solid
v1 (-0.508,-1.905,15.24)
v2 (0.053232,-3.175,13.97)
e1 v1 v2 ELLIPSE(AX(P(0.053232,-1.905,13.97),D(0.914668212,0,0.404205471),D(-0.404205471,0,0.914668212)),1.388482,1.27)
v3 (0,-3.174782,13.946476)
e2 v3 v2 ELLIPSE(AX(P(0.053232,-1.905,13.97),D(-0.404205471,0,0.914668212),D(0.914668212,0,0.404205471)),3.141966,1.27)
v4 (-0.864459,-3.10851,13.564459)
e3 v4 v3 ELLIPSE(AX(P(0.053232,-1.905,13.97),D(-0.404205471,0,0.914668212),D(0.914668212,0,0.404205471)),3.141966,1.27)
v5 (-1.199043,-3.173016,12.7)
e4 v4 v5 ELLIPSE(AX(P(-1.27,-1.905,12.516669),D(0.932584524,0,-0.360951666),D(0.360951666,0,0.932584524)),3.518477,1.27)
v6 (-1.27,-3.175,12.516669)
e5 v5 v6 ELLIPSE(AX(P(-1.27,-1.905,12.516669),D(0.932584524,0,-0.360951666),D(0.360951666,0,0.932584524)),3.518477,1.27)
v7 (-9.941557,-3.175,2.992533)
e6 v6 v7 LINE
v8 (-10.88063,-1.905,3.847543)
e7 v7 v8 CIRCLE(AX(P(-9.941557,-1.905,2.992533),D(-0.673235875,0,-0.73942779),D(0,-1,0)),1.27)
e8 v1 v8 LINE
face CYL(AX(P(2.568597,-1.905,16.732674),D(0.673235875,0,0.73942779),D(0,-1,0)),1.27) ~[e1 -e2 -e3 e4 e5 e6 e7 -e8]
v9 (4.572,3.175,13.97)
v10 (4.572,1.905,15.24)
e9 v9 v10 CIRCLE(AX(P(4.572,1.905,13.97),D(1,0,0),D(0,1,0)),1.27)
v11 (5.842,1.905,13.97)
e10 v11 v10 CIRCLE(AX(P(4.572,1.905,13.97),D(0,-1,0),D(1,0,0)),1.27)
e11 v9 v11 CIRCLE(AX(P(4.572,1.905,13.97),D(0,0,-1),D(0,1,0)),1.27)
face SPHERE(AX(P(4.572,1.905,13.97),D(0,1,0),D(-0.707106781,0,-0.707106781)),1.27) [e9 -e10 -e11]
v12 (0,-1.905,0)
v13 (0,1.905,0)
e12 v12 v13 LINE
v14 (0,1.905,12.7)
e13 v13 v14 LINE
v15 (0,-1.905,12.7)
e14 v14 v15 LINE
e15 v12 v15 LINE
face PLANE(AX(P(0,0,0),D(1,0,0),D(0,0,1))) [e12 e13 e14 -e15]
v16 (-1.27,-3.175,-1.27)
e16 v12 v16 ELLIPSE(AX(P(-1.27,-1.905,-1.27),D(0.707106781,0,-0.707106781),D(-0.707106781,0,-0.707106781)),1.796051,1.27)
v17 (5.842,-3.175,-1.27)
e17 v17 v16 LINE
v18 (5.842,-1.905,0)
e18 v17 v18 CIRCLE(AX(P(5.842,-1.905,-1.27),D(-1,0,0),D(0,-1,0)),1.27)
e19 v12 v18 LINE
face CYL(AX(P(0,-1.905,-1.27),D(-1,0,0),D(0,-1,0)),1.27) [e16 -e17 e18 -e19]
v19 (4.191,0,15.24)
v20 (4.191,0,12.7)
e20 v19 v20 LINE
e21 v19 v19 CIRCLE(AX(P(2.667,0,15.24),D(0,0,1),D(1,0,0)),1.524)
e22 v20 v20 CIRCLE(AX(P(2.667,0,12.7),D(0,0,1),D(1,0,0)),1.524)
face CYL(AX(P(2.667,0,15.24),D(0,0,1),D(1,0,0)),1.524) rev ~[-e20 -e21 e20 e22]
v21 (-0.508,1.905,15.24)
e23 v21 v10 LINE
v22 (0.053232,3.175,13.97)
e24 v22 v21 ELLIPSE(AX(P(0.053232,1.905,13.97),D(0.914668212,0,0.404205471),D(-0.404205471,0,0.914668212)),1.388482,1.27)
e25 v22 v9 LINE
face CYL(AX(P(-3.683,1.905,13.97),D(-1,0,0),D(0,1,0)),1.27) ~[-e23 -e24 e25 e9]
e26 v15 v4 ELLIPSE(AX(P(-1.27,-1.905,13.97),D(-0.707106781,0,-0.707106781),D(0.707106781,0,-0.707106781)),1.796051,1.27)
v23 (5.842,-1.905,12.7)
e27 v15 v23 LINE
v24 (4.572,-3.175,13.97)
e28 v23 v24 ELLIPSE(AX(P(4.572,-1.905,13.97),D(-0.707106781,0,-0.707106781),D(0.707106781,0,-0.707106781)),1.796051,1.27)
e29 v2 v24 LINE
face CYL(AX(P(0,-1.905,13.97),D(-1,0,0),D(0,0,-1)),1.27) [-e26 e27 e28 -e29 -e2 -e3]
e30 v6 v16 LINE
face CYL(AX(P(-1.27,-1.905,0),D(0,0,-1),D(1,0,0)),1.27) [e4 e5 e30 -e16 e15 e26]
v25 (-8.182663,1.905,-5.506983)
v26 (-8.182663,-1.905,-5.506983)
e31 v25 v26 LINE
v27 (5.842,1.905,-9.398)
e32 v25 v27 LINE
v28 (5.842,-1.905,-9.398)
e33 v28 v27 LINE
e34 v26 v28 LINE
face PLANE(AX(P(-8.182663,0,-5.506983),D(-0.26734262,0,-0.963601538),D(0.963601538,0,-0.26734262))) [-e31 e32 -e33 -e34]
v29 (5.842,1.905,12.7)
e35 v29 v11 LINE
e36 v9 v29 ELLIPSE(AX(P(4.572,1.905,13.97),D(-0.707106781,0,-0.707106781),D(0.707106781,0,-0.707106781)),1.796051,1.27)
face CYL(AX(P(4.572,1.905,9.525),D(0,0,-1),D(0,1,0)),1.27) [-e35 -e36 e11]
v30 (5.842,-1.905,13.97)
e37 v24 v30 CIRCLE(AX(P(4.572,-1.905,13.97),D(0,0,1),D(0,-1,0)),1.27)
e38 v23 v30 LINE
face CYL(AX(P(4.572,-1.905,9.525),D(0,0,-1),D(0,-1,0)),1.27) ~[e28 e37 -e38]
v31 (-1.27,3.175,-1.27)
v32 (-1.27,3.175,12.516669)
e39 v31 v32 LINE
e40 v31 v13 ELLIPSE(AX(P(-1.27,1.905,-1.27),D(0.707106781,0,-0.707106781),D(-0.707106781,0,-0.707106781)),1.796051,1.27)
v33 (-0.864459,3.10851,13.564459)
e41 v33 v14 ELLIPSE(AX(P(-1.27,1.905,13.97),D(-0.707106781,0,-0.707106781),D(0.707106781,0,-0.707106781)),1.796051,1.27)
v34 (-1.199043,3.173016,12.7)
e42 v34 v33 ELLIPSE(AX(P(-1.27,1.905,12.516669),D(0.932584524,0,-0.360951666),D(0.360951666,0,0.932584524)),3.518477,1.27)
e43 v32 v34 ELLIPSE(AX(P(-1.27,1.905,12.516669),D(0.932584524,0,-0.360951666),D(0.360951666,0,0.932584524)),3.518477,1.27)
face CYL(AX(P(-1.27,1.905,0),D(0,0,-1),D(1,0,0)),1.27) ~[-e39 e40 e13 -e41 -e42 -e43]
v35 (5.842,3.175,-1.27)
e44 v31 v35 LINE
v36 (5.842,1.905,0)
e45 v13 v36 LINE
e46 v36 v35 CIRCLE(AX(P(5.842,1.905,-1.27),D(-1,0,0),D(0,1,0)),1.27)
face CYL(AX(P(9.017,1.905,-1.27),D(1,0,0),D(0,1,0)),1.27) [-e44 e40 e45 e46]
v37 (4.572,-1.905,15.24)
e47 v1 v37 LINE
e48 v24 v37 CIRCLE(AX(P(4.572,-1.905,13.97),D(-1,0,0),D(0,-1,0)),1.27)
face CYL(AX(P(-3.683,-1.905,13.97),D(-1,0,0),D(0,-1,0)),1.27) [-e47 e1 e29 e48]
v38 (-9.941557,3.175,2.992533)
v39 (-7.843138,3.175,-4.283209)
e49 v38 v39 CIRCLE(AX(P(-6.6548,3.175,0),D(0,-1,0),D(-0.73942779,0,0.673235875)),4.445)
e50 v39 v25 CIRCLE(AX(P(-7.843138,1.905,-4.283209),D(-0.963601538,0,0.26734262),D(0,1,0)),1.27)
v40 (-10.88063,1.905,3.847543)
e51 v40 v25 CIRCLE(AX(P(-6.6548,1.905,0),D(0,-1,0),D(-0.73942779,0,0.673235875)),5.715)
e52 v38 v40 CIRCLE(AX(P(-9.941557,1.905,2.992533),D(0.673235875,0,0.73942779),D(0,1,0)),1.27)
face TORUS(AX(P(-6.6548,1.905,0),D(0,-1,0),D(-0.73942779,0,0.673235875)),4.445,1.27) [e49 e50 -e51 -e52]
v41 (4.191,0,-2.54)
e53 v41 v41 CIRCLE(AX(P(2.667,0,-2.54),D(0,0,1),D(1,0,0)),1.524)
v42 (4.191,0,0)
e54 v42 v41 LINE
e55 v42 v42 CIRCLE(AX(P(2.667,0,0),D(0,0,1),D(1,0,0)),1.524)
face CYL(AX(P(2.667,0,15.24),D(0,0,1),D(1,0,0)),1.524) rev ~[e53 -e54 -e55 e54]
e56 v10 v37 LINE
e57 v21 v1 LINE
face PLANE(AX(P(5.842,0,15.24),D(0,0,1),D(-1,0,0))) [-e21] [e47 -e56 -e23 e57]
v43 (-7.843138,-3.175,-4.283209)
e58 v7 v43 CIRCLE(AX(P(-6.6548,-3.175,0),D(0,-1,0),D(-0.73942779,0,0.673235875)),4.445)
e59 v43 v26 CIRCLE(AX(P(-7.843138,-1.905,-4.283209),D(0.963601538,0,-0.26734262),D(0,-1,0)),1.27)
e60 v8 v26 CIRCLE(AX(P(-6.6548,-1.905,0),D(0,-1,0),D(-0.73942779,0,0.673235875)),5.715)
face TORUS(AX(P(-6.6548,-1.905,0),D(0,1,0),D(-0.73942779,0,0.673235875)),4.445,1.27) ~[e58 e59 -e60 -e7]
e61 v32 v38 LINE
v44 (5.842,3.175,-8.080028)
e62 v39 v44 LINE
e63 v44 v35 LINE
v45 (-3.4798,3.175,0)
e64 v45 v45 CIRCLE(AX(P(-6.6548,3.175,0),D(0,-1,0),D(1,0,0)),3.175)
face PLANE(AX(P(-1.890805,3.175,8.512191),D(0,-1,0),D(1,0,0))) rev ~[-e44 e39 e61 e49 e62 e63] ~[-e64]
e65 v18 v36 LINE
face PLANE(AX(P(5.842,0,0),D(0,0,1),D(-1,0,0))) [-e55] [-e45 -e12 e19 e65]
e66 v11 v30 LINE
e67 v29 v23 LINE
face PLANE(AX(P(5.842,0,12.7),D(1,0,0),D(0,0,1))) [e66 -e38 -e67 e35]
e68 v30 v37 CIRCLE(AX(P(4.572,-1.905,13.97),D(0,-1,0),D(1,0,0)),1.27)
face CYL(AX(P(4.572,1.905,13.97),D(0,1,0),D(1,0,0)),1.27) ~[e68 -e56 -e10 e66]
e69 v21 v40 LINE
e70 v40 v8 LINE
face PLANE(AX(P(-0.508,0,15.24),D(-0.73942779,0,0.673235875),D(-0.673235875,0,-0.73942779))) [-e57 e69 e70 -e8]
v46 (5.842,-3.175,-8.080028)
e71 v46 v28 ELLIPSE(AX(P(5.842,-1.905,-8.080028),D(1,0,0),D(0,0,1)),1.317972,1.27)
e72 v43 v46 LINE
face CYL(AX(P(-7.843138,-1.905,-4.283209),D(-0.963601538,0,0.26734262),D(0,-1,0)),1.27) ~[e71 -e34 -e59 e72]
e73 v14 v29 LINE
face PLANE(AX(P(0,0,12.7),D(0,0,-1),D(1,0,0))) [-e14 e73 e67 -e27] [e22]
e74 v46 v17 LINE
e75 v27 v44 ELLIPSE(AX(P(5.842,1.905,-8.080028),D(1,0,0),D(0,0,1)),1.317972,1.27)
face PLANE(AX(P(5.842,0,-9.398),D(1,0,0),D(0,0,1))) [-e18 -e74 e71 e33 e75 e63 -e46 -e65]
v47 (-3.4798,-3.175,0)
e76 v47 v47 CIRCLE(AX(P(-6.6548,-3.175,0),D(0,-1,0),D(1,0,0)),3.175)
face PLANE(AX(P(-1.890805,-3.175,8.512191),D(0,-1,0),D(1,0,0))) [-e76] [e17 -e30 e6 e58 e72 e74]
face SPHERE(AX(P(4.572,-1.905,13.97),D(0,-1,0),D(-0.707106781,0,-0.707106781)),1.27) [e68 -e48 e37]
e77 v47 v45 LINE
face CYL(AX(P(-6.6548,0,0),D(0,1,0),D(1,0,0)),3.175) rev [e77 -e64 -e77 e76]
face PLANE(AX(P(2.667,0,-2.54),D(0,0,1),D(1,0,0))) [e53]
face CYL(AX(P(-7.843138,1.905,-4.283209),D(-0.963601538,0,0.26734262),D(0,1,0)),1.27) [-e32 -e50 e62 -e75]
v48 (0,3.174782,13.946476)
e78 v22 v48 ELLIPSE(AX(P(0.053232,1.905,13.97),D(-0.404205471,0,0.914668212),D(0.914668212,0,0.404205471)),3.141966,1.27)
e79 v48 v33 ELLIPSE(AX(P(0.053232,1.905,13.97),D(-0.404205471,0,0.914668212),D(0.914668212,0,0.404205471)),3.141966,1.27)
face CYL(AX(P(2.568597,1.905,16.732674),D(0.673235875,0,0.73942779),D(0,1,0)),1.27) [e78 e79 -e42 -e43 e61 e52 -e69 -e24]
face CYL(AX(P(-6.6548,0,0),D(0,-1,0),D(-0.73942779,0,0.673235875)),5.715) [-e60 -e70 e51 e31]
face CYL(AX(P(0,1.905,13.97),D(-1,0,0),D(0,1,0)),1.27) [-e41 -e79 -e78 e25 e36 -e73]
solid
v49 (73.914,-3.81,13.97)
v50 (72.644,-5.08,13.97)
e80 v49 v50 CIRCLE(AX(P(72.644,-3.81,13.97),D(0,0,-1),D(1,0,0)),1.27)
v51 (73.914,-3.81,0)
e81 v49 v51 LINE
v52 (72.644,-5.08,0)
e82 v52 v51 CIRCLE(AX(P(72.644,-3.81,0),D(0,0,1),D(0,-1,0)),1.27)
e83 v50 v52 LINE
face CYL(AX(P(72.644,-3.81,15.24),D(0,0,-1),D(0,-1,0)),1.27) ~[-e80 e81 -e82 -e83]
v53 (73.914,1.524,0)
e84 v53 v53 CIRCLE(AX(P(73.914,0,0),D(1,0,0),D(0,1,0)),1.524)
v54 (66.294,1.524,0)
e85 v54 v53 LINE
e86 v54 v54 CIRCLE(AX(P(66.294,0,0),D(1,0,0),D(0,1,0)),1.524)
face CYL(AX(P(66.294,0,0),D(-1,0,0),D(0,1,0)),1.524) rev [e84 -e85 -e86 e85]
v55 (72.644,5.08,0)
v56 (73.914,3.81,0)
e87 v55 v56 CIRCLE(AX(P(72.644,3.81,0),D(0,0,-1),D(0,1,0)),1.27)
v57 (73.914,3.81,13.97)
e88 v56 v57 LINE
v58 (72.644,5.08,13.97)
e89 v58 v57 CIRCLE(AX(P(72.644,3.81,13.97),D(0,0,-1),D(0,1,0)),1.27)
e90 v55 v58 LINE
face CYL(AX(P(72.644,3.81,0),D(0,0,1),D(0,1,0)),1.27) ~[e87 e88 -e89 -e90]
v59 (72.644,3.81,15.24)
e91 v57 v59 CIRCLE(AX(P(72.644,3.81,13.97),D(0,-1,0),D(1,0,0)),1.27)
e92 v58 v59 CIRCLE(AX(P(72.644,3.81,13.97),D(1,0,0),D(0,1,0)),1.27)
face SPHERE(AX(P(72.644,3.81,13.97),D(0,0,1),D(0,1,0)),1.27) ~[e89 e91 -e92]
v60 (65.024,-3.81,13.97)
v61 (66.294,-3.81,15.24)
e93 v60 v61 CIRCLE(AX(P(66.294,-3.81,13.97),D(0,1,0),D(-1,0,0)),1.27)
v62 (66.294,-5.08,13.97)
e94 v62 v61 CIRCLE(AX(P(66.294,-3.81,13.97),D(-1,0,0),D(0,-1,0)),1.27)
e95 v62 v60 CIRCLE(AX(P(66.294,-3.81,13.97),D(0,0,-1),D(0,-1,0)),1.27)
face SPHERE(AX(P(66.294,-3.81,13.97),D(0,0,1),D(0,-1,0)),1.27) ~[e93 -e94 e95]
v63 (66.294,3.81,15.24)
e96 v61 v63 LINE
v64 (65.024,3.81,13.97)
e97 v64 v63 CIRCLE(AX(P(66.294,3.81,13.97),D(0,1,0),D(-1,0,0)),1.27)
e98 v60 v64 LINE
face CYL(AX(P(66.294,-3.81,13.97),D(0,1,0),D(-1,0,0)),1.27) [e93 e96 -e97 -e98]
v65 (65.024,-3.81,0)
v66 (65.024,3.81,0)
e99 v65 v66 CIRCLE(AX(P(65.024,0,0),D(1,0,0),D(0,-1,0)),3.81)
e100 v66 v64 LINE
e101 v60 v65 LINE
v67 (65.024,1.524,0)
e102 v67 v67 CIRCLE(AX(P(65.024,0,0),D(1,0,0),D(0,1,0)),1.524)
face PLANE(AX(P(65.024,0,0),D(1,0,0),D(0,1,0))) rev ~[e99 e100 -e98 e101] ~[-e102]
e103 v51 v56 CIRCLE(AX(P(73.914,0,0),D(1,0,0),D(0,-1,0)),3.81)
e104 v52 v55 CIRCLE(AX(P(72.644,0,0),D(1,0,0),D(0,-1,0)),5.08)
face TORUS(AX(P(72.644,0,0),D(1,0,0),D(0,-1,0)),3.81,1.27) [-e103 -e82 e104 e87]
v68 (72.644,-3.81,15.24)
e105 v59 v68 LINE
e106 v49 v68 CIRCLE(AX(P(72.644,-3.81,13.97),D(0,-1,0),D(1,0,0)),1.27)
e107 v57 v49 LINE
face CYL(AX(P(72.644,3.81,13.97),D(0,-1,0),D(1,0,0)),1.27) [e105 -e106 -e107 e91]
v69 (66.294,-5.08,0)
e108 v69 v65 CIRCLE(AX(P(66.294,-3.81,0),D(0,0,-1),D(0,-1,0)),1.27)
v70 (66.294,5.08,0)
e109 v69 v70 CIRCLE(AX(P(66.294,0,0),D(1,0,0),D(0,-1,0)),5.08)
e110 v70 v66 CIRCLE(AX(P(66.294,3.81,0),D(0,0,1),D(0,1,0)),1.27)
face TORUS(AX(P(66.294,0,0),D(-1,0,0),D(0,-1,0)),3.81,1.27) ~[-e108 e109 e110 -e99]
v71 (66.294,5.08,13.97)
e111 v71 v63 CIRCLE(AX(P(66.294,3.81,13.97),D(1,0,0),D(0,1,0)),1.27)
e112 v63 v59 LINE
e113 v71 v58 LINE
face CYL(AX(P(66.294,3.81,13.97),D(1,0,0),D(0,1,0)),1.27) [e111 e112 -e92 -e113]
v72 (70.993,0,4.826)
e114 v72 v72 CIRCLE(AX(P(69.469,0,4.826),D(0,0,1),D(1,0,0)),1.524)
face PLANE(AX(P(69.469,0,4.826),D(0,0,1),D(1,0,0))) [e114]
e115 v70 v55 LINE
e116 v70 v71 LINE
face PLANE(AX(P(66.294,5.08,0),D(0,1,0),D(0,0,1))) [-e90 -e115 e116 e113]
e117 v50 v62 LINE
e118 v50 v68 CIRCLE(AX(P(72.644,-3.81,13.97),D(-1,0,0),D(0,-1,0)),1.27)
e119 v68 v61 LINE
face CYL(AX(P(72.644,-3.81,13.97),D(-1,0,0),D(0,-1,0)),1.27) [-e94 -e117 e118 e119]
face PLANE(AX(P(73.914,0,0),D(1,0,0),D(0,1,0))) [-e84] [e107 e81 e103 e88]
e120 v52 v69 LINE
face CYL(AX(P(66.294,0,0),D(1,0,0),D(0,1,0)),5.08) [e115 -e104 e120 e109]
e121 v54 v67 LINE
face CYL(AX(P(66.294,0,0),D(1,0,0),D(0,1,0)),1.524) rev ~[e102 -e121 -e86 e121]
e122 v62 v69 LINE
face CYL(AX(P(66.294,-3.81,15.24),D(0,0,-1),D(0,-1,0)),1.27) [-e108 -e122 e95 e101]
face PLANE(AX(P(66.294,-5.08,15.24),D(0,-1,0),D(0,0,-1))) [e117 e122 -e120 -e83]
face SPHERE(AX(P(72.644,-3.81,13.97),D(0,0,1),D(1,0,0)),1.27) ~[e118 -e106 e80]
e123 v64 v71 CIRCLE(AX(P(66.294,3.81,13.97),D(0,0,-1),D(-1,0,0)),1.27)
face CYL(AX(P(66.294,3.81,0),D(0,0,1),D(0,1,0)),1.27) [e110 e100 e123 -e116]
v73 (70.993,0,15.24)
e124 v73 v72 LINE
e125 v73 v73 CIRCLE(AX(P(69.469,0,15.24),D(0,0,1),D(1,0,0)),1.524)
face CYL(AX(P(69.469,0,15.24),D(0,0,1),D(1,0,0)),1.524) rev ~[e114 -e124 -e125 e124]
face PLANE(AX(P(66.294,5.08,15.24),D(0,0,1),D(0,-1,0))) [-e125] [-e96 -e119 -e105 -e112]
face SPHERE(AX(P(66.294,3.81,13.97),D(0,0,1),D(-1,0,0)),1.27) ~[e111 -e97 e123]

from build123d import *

# Parameters (mm, degrees)
F0_R          = 3.175
F2_DEPTH      = 3.175
F3_R          = 1.524
F4_DEPTH      = 7.62
F4_DEPTH_BACK = 1.27
F5_DEPTH      = 56.134
F7_R          = 1.524
F8_DEPTH      = 17.78
F6_R          = 1.524
F9_DEPTH      = 10.414
F10_T1_DEPTH  = 18.5821257943
F10_T3_DEPTH  = 8.255
F10_T5_DEPTH  = 4.445
F10_T7_DEPTH  = 9.017
F10_T9_DEPTH  = 12.7
F10_T11_DEPTH = 17.7294216388
F10_T13_DEPTH = 3.81
F10_S17_W     = 1.27
F10_S17_H     = 1.27
F10_T18_DEPTH = 1.27
F10_S23_W     = 1.27
F10_S23_H     = 1.27
F10_T24_DEPTH = 1.27
F10_T28_ANGLE = 116.8111069241
F10_T30_ANGLE = 116.8111069241
F10_T35_DEPTH = 15.875
F10_T39_DEPTH = 12.192
F10_T46_DEPTH = 15.875
F10_T50_DEPTH = 12.192
F10_T57_DEPTH = 15.875
F10_T61_DEPTH = 12.192
F10_T68_DEPTH = 15.875
F10_T72_DEPTH = 12.192
F10_2_F1_R    = 1.27
F10_2_F2_R    = 1.27
F10_2_F3_R    = 1.27


# Not quite as in the source:
# - a fillet or chamfer that OpenCascade refuses, or shapes differently, is made with other operations: its cross-section is extruded or revolved along the edge and cut away or added
# - two fillets or chamfers of one size are made in one step
# - the program builds the solid bodies; features that only make, move or delete a surface that nothing else refers to are left out


with BuildPart() as f2:
    # F0 (on Front) → F2 (new body, symmetric)
    with BuildSketch(Plane.XZ):
        with BuildLine():
            Line((-0.9398, 0), (0, 0))
            Line((0, 0), (0, 12.7))
            Line((0, 12.7), (5.842, 12.7))
            Line((5.842, 12.7), (5.842, 15.24))
            Line((5.842, 15.24), (-0.508, 15.24))
            Line((-0.508, 15.24), (-10.8806298187, 3.8475430269))
            ThreePointArc((-10.8806298187, 3.8475430269), (-4.5919612295, 5.3297205562), (-0.9398, 0))
        make_face()
        with BuildLine():
            ThreePointArc((-8.1826630726, -5.5069827884), (-3.1957909266, -4.5493385486), (-0.9398, 0))
            ThreePointArc((-0.9398, 0), (-4.5919612295, 5.3297205562), (-10.8806298187, 3.8475430269))
            ThreePointArc((-10.8806298187, 3.8475430269), (-12.1459778134, -1.5837270034), (-8.1826630726, -5.5069827884))
        make_face()
        with Locations((-6.6548, 0)):
            Circle(F0_R, mode=Mode.SUBTRACT)
        with BuildLine():
            Line((5.842, 0), (0, 0))
            Line((0, 0), (-0.9398, 0))
            ThreePointArc((-0.9398, 0), (-3.1957909266, -4.5493385486), (-8.1826630726, -5.5069827884))
            Line((-8.1826630726, -5.5069827884), (5.842, -9.398))
            Line((5.842, -9.398), (5.842, 0))
        make_face()
    extrude(amount=F2_DEPTH, both=True)

    # F3 (on face) → F5 (cut)
    with BuildSketch(Plane.YZ.offset(66.294)):
        Circle(F3_R)
    extrude(amount=-F5_DEPTH, mode=Mode.SUBTRACT)

    # F7 (on face) → F8 (cut)
    with BuildSketch(Plane.XY.offset(15.24)):
        with Locations((2.667, 0)):
            Circle(F7_R)
    extrude(amount=-F8_DEPTH, mode=Mode.SUBTRACT)

    # F10: fillet of radius 1.27 on 17 edges, made by hand

    # F10_s2 → F10_t1 (cut)
    with BuildSketch(Plane(origin=(9.4938886236, 0, 10.4273187748), x_dir=(0, 1, 0), z_dir=(-0.6732358752, 0, -0.7394277898))):
        with BuildLine():
            ThreePointArc((-3.175, -9.3657440555), (-2.8030256121, -10.2637696676), (-1.905, -10.6357440555))
            Line((-1.905, -10.6357440555), (-3.175, -10.6357440555))
            Line((-3.175, -10.6357440555), (-3.175, -9.3657440555))
        make_face()
        with BuildLine():
            ThreePointArc((3.175, -9.3657440555), (2.8030256121, -10.2637696676), (1.905, -10.6357440555))
            Line((1.905, -10.6357440555), (3.175, -10.6357440555))
            Line((3.175, -10.6357440555), (3.175, -9.3657440555))
        make_face()
    extrude(amount=F10_T1_DEPTH, mode=Mode.SUBTRACT)

    # F10_s4 → F10_t3 (cut)
    with BuildSketch(Plane.YZ.offset(-3.683)):
        with BuildLine():
            ThreePointArc((-3.175, 13.97), (-2.8030256121, 14.8680256121), (-1.905, 15.24))
            Line((-1.905, 15.24), (-3.175, 15.24))
            Line((-3.175, 15.24), (-3.175, 13.97))
        make_face()
        with BuildLine():
            ThreePointArc((3.175, 13.97), (2.8030256121, 14.8680256121), (1.905, 15.24))
            Line((1.905, 15.24), (3.175, 15.24))
            Line((3.175, 15.24), (3.175, 13.97))
        make_face()
    extrude(amount=F10_T3_DEPTH, mode=Mode.SUBTRACT)

    # F10_s6 → F10_t5 (cut)
    with BuildSketch(Plane.XY.offset(9.525)):
        with BuildLine():
            ThreePointArc((4.572, -3.175), (5.4700256121, -2.8030256121), (5.842, -1.905))
            Line((5.842, -1.905), (5.842, -3.175))
            Line((5.842, -3.175), (4.572, -3.175))
        make_face()
        with BuildLine():
            ThreePointArc((4.572, 3.175), (5.4700256121, 2.8030256121), (5.842, 1.905))
            Line((5.842, 1.905), (5.842, 3.175))
            Line((5.842, 3.175), (4.572, 3.175))
        make_face()
    extrude(amount=F10_T5_DEPTH, mode=Mode.SUBTRACT)

    # F10_s8 → F10_t7 (cut)
    with BuildSketch(Plane.YZ):
        with BuildLine():
            ThreePointArc((-1.905, 12.7), (-2.8030256121, 13.0719743879), (-3.175, 13.97))
            Line((-3.175, 13.97), (-3.175, 12.7))
            Line((-3.175, 12.7), (-1.905, 12.7))
        make_face()
        with BuildLine():
            ThreePointArc((3.175, 13.97), (2.8030256121, 13.0719743879), (1.905, 12.7))
            Line((1.905, 12.7), (3.175, 12.7))
            Line((3.175, 12.7), (3.175, 13.97))
        make_face()
        with BuildLine():
            ThreePointArc((3.175, -1.27), (2.8030256121, -0.3719743879), (1.905, 0))
            Line((1.905, 0), (3.175, 0))
            Line((3.175, 0), (3.175, -1.27))
        make_face()
        with BuildLine():
            ThreePointArc((-3.175, -1.27), (-2.8030256121, -0.3719743879), (-1.905, 0))
            Line((-1.905, 0), (-3.175, 0))
            Line((-3.175, 0), (-3.175, -1.27))
        make_face()
    extrude(amount=F10_T7_DEPTH, mode=Mode.SUBTRACT)

    # F10_s10 → F10_t9 (cut)
    with BuildSketch(Plane.XY):
        with BuildLine():
            ThreePointArc((0, -1.905), (-0.3719743879, -2.8030256121), (-1.27, -3.175))
            Line((-1.27, -3.175), (0, -3.175))
            Line((0, -3.175), (0, -1.905))
        make_face()
        with BuildLine():
            ThreePointArc((0, 1.905), (-0.3719743879, 2.8030256121), (-1.27, 3.175))
            Line((-1.27, 3.175), (0, 3.175))
            Line((0, 3.175), (0, 1.905))
        make_face()
    extrude(amount=F10_T9_DEPTH, mode=Mode.SUBTRACT)

    # F10_s12 → F10_t11 (cut)
    with BuildSketch(Plane(origin=(-6.179167626, 0, 1.7143547379), x_dir=(0, 1, 0), z_dir=(0.9636015378, 0, -0.2673426199))):
        with BuildLine():
            ThreePointArc((-3.175, -6.2241116667), (-2.8030256121, -7.1221372788), (-1.905, -7.4941116667))
            Line((-1.905, -7.4941116667), (-3.175, -7.4941116667))
            Line((-3.175, -7.4941116667), (-3.175, -6.2241116667))
        make_face()
        with BuildLine():
            ThreePointArc((3.175, -6.2241116667), (2.8030256121, -7.1221372788), (1.905, -7.4941116667))
            Line((1.905, -7.4941116667), (3.175, -7.4941116667))
            Line((3.175, -7.4941116667), (3.175, -6.2241116667))
        make_face()
    extrude(amount=F10_T11_DEPTH, mode=Mode.SUBTRACT)

    # F10_s14 → F10_t13 (cut)
    with BuildSketch(Plane.XZ.offset(-1.905)):
        with BuildLine():
            ThreePointArc((5.842, 13.97), (5.4700256121, 14.8680256121), (4.572, 15.24))
            Line((4.572, 15.24), (5.842, 15.24))
            Line((5.842, 15.24), (5.842, 13.97))
        make_face()
    extrude(amount=F10_T13_DEPTH, mode=Mode.SUBTRACT)


with BuildPart() as f4:
    # F3 (on face) → F4 (new body, two sides)
    with BuildSketch(Plane.YZ.offset(66.294)) as f4_sk:
        with BuildLine():
            ThreePointArc((-5.08, 0), (0, -5.08), (5.08, 0))
            ThreePointArc((5.08, 0), (0, 5.08), (-5.08, 0))
        make_face()
        Circle(F3_R, mode=Mode.SUBTRACT)
        with BuildLine():
            ThreePointArc((-5.08, 0), (0, 5.08), (5.08, 0))
            Line((5.08, 0), (5.08, 15.24))
            Line((5.08, 15.24), (-5.08, 15.24))
            Line((-5.08, 15.24), (-5.08, 0))
        make_face()
    extrude(amount=F4_DEPTH)
    extrude(f4_sk.sketch, amount=-F4_DEPTH_BACK)

    # F6 (on face) → F9 (cut)
    with BuildSketch(Plane.XY.offset(15.24)):
        with Locations((69.469, 0)):
            Circle(F6_R)
    extrude(amount=-F9_DEPTH, mode=Mode.SUBTRACT)

    # F10#2: fillet of radius 1.27 on 10 edges, made by hand

    # F10_2_f1
    f10_2_f1_edges = [f4.edges().sort_by_distance(p)[0] for p in [
        (73.914, 0, -5.08),
        (73.914, -5.08, 7.62),
        (73.914, 5.08, 7.62),
    ]]
    fillet(f10_2_f1_edges, radius=F10_2_F1_R)

    # F10_2_f2
    f10_2_f2_edges = [f4.edges().sort_by_distance(p)[0] for p in [
        (65.024, 0, -5.08),
        (65.024, -5.08, 7.62),
        (65.024, 5.08, 7.62),
    ]]
    fillet(f10_2_f2_edges, radius=F10_2_F2_R)

    # F10_2_f3
    f10_2_f3_edges = [f4.edges().sort_by_distance(p)[0] for p in [
        (69.469, -5.08, 15.24),
    ]]
    fillet(f10_2_f3_edges, radius=F10_2_F3_R)


with BuildPart() as f10_tool16:
    # F10_s17 → F10_t18 (new body)
    with BuildSketch(Plane.XZ.offset(1.905)):
        with Locations((5.207, 14.605)):
            Rectangle(F10_S17_W, F10_S17_H)
    extrude(amount=F10_T18_DEPTH)

    # F10_s19 → F10_t20 (revolve, cut)
    with BuildSketch(Plane(origin=(4.572, -1.905, 13.97), x_dir=(-0.7071067812, 0, -0.7071067812), z_dir=(-0.7071067812, 0, 0.7071067812))):
        with BuildLine():
            ThreePointArc((0, -1.27), (1.27, 0), (0, 1.27))
            Line((0, 1.27), (0, -1.27))
        make_face()
    revolve(axis=Axis((4.572, -1.905, 13.97), (0, -1, 0)), mode=Mode.SUBTRACT)


with BuildPart() as f2_1:
    add(f2.part)

    # F10_t15: cut F10_tool16
    add(f10_tool16.part, mode=Mode.SUBTRACT)


with BuildPart() as f10_tool22:
    # F10_s23 → F10_t24 (new body)
    with BuildSketch(Plane.XZ.offset(-1.905)):
        with Locations((5.207, 14.605)):
            Rectangle(F10_S23_W, F10_S23_H)
    extrude(amount=-F10_T24_DEPTH)

    # F10_s25 → F10_t26 (revolve, cut)
    with BuildSketch(Plane(origin=(4.572, 1.905, 13.97), x_dir=(-0.7071067812, 0, -0.7071067812), z_dir=(0.7071067812, 0, -0.7071067812))):
        with BuildLine():
            ThreePointArc((0, -1.27), (1.27, 0), (0, 1.27))
            Line((0, 1.27), (0, -1.27))
        make_face()
    revolve(axis=Axis((4.572, 1.905, 13.97), (0, 1, 0)), mode=Mode.SUBTRACT)


with BuildPart() as f2_2:
    add(f2_1.part)

    # F10_t21: cut F10_tool22
    add(f10_tool22.part, mode=Mode.SUBTRACT)

    # F10_s27 → F10_t28 (revolve, cut)
    with BuildSketch(Plane(origin=(-3.0162650989, 0, -3.3128214309), x_dir=(0, 1, 0), z_dir=(0.6732358752, 0, 0.7394277898))):
        with BuildLine():
            ThreePointArc((-3.175, 9.3657440555), (-2.8030256121, 10.2637696676), (-1.905, 10.6357440555))
            Line((-1.905, 10.6357440555), (-3.175, 10.6357440555))
            Line((-3.175, 10.6357440555), (-3.175, 9.3657440555))
        make_face()
    revolve(axis=Axis((-6.6548, -3.175, 0), (0, -1, 0)), revolution_arc=F10_T28_ANGLE, mode=Mode.SUBTRACT)

    # F10_s29 → F10_t30 (revolve, cut)
    with BuildSketch(Plane(origin=(-3.0162650989, 0, -3.3128214309), x_dir=(0, 1, 0), z_dir=(0.6732358752, 0, 0.7394277898))):
        with BuildLine():
            ThreePointArc((3.175, 9.3657440555), (2.8030256121, 10.2637696676), (1.905, 10.6357440555))
            Line((1.905, 10.6357440555), (3.175, 10.6357440555))
            Line((3.175, 10.6357440555), (3.175, 9.3657440555))
        make_face()
    revolve(axis=Axis((-6.6548, 3.175, 0), (0, -1, 0)), revolution_arc=F10_T30_ANGLE, mode=Mode.SUBTRACT)


with BuildPart() as f10_tool33:
    # F10_s34 → F10_t35 (new body)
    with BuildSketch(Plane.XY):
        with BuildLine():
            ThreePointArc((0, -1.905), (-0.3719743879, -2.8030256121), (-1.27, -3.175))
            Line((-1.27, -3.175), (0, -3.175))
            Line((0, -3.175), (0, -1.905))
        make_face()
    extrude(amount=F10_T35_DEPTH)

    split(bisect_by=Plane.XY.offset(12.7), keep=Keep.TOP)


with BuildPart() as f10_tool37:
    # F10_s38 → F10_t39 (new body)
    with BuildSketch(Plane.YZ.offset(-3.175)):
        with BuildLine():
            ThreePointArc((-1.905, 12.7), (-2.8030256121, 13.0719743879), (-3.175, 13.97))
            Line((-3.175, 13.97), (-3.175, 12.7))
            Line((-3.175, 12.7), (-1.905, 12.7))
        make_face()
    extrude(amount=F10_T39_DEPTH)

    split(bisect_by=Plane.YZ, keep=Keep.BOTTOM)


with BuildPart() as f10_tool33_1:
    add(f10_tool33.part)

    # F10_t41: intersect F10_tool37
    add(f10_tool37.part, mode=Mode.INTERSECT)


with BuildPart() as f2_3:
    add(f2_2.part)

    # F10_t31: cut F10_tool33
    add(f10_tool33_1.part, mode=Mode.SUBTRACT)


with BuildPart() as f10_tool44:
    # F10_s45 → F10_t46 (new body)
    with BuildSketch(Plane.XY.offset(-3.175)):
        with BuildLine():
            ThreePointArc((0, -1.905), (-0.3719743879, -2.8030256121), (-1.27, -3.175))
            Line((-1.27, -3.175), (0, -3.175))
            Line((0, -3.175), (0, -1.905))
        make_face()
    extrude(amount=F10_T46_DEPTH)

    split(bisect_by=Plane.XY, keep=Keep.BOTTOM)


with BuildPart() as f10_tool48:
    # F10_s49 → F10_t50 (new body)
    with BuildSketch(Plane.YZ.offset(9.017)):
        with BuildLine():
            ThreePointArc((-3.175, -1.27), (-2.8030256121, -0.3719743879), (-1.905, 0))
            Line((-1.905, 0), (-3.175, 0))
            Line((-3.175, 0), (-3.175, -1.27))
        make_face()
    extrude(amount=-F10_T50_DEPTH)

    split(bisect_by=Plane.YZ, keep=Keep.BOTTOM)


with BuildPart() as f10_tool44_1:
    add(f10_tool44.part)

    # F10_t52: intersect F10_tool48
    add(f10_tool48.part, mode=Mode.INTERSECT)


with BuildPart() as f2_4:
    add(f2_3.part)

    # F10_t42: cut F10_tool44
    add(f10_tool44_1.part, mode=Mode.SUBTRACT)


with BuildPart() as f10_tool55:
    # F10_s56 → F10_t57 (new body)
    with BuildSketch(Plane.XY):
        with BuildLine():
            ThreePointArc((0, 1.905), (-0.3719743879, 2.8030256121), (-1.27, 3.175))
            Line((-1.27, 3.175), (0, 3.175))
            Line((0, 3.175), (0, 1.905))
        make_face()
    extrude(amount=F10_T57_DEPTH)

    split(bisect_by=Plane.XY.offset(12.7), keep=Keep.TOP)


with BuildPart() as f10_tool59:
    # F10_s60 → F10_t61 (new body)
    with BuildSketch(Plane.YZ.offset(-3.175)):
        with BuildLine():
            ThreePointArc((3.175, 13.97), (2.8030256121, 13.0719743879), (1.905, 12.7))
            Line((1.905, 12.7), (3.175, 12.7))
            Line((3.175, 12.7), (3.175, 13.97))
        make_face()
    extrude(amount=F10_T61_DEPTH)

    split(bisect_by=Plane.YZ, keep=Keep.BOTTOM)


with BuildPart() as f10_tool55_1:
    add(f10_tool55.part)

    # F10_t63: intersect F10_tool59
    add(f10_tool59.part, mode=Mode.INTERSECT)


with BuildPart() as f2_5:
    add(f2_4.part)

    # F10_t53: cut F10_tool55
    add(f10_tool55_1.part, mode=Mode.SUBTRACT)


with BuildPart() as f10_tool66:
    # F10_s67 → F10_t68 (new body)
    with BuildSketch(Plane.XY.offset(-3.175)):
        with BuildLine():
            ThreePointArc((0, 1.905), (-0.3719743879, 2.8030256121), (-1.27, 3.175))
            Line((-1.27, 3.175), (0, 3.175))
            Line((0, 3.175), (0, 1.905))
        make_face()
    extrude(amount=F10_T68_DEPTH)

    split(bisect_by=Plane.XY, keep=Keep.BOTTOM)


with BuildPart() as f10_tool70:
    # F10_s71 → F10_t72 (new body)
    with BuildSketch(Plane.YZ.offset(9.017)):
        with BuildLine():
            ThreePointArc((3.175, -1.27), (2.8030256121, -0.3719743879), (1.905, 0))
            Line((1.905, 0), (3.175, 0))
            Line((3.175, 0), (3.175, -1.27))
        make_face()
    extrude(amount=-F10_T72_DEPTH)

    split(bisect_by=Plane.YZ, keep=Keep.BOTTOM)


with BuildPart() as f10_tool66_1:
    add(f10_tool66.part)

    # F10_t74: intersect F10_tool70
    add(f10_tool70.part, mode=Mode.INTERSECT)


with BuildPart() as f2_6:
    add(f2_5.part)

    # F10_t64: cut F10_tool66
    add(f10_tool66_1.part, mode=Mode.SUBTRACT)


solid = Compound([f4.part, f2_6.part])
